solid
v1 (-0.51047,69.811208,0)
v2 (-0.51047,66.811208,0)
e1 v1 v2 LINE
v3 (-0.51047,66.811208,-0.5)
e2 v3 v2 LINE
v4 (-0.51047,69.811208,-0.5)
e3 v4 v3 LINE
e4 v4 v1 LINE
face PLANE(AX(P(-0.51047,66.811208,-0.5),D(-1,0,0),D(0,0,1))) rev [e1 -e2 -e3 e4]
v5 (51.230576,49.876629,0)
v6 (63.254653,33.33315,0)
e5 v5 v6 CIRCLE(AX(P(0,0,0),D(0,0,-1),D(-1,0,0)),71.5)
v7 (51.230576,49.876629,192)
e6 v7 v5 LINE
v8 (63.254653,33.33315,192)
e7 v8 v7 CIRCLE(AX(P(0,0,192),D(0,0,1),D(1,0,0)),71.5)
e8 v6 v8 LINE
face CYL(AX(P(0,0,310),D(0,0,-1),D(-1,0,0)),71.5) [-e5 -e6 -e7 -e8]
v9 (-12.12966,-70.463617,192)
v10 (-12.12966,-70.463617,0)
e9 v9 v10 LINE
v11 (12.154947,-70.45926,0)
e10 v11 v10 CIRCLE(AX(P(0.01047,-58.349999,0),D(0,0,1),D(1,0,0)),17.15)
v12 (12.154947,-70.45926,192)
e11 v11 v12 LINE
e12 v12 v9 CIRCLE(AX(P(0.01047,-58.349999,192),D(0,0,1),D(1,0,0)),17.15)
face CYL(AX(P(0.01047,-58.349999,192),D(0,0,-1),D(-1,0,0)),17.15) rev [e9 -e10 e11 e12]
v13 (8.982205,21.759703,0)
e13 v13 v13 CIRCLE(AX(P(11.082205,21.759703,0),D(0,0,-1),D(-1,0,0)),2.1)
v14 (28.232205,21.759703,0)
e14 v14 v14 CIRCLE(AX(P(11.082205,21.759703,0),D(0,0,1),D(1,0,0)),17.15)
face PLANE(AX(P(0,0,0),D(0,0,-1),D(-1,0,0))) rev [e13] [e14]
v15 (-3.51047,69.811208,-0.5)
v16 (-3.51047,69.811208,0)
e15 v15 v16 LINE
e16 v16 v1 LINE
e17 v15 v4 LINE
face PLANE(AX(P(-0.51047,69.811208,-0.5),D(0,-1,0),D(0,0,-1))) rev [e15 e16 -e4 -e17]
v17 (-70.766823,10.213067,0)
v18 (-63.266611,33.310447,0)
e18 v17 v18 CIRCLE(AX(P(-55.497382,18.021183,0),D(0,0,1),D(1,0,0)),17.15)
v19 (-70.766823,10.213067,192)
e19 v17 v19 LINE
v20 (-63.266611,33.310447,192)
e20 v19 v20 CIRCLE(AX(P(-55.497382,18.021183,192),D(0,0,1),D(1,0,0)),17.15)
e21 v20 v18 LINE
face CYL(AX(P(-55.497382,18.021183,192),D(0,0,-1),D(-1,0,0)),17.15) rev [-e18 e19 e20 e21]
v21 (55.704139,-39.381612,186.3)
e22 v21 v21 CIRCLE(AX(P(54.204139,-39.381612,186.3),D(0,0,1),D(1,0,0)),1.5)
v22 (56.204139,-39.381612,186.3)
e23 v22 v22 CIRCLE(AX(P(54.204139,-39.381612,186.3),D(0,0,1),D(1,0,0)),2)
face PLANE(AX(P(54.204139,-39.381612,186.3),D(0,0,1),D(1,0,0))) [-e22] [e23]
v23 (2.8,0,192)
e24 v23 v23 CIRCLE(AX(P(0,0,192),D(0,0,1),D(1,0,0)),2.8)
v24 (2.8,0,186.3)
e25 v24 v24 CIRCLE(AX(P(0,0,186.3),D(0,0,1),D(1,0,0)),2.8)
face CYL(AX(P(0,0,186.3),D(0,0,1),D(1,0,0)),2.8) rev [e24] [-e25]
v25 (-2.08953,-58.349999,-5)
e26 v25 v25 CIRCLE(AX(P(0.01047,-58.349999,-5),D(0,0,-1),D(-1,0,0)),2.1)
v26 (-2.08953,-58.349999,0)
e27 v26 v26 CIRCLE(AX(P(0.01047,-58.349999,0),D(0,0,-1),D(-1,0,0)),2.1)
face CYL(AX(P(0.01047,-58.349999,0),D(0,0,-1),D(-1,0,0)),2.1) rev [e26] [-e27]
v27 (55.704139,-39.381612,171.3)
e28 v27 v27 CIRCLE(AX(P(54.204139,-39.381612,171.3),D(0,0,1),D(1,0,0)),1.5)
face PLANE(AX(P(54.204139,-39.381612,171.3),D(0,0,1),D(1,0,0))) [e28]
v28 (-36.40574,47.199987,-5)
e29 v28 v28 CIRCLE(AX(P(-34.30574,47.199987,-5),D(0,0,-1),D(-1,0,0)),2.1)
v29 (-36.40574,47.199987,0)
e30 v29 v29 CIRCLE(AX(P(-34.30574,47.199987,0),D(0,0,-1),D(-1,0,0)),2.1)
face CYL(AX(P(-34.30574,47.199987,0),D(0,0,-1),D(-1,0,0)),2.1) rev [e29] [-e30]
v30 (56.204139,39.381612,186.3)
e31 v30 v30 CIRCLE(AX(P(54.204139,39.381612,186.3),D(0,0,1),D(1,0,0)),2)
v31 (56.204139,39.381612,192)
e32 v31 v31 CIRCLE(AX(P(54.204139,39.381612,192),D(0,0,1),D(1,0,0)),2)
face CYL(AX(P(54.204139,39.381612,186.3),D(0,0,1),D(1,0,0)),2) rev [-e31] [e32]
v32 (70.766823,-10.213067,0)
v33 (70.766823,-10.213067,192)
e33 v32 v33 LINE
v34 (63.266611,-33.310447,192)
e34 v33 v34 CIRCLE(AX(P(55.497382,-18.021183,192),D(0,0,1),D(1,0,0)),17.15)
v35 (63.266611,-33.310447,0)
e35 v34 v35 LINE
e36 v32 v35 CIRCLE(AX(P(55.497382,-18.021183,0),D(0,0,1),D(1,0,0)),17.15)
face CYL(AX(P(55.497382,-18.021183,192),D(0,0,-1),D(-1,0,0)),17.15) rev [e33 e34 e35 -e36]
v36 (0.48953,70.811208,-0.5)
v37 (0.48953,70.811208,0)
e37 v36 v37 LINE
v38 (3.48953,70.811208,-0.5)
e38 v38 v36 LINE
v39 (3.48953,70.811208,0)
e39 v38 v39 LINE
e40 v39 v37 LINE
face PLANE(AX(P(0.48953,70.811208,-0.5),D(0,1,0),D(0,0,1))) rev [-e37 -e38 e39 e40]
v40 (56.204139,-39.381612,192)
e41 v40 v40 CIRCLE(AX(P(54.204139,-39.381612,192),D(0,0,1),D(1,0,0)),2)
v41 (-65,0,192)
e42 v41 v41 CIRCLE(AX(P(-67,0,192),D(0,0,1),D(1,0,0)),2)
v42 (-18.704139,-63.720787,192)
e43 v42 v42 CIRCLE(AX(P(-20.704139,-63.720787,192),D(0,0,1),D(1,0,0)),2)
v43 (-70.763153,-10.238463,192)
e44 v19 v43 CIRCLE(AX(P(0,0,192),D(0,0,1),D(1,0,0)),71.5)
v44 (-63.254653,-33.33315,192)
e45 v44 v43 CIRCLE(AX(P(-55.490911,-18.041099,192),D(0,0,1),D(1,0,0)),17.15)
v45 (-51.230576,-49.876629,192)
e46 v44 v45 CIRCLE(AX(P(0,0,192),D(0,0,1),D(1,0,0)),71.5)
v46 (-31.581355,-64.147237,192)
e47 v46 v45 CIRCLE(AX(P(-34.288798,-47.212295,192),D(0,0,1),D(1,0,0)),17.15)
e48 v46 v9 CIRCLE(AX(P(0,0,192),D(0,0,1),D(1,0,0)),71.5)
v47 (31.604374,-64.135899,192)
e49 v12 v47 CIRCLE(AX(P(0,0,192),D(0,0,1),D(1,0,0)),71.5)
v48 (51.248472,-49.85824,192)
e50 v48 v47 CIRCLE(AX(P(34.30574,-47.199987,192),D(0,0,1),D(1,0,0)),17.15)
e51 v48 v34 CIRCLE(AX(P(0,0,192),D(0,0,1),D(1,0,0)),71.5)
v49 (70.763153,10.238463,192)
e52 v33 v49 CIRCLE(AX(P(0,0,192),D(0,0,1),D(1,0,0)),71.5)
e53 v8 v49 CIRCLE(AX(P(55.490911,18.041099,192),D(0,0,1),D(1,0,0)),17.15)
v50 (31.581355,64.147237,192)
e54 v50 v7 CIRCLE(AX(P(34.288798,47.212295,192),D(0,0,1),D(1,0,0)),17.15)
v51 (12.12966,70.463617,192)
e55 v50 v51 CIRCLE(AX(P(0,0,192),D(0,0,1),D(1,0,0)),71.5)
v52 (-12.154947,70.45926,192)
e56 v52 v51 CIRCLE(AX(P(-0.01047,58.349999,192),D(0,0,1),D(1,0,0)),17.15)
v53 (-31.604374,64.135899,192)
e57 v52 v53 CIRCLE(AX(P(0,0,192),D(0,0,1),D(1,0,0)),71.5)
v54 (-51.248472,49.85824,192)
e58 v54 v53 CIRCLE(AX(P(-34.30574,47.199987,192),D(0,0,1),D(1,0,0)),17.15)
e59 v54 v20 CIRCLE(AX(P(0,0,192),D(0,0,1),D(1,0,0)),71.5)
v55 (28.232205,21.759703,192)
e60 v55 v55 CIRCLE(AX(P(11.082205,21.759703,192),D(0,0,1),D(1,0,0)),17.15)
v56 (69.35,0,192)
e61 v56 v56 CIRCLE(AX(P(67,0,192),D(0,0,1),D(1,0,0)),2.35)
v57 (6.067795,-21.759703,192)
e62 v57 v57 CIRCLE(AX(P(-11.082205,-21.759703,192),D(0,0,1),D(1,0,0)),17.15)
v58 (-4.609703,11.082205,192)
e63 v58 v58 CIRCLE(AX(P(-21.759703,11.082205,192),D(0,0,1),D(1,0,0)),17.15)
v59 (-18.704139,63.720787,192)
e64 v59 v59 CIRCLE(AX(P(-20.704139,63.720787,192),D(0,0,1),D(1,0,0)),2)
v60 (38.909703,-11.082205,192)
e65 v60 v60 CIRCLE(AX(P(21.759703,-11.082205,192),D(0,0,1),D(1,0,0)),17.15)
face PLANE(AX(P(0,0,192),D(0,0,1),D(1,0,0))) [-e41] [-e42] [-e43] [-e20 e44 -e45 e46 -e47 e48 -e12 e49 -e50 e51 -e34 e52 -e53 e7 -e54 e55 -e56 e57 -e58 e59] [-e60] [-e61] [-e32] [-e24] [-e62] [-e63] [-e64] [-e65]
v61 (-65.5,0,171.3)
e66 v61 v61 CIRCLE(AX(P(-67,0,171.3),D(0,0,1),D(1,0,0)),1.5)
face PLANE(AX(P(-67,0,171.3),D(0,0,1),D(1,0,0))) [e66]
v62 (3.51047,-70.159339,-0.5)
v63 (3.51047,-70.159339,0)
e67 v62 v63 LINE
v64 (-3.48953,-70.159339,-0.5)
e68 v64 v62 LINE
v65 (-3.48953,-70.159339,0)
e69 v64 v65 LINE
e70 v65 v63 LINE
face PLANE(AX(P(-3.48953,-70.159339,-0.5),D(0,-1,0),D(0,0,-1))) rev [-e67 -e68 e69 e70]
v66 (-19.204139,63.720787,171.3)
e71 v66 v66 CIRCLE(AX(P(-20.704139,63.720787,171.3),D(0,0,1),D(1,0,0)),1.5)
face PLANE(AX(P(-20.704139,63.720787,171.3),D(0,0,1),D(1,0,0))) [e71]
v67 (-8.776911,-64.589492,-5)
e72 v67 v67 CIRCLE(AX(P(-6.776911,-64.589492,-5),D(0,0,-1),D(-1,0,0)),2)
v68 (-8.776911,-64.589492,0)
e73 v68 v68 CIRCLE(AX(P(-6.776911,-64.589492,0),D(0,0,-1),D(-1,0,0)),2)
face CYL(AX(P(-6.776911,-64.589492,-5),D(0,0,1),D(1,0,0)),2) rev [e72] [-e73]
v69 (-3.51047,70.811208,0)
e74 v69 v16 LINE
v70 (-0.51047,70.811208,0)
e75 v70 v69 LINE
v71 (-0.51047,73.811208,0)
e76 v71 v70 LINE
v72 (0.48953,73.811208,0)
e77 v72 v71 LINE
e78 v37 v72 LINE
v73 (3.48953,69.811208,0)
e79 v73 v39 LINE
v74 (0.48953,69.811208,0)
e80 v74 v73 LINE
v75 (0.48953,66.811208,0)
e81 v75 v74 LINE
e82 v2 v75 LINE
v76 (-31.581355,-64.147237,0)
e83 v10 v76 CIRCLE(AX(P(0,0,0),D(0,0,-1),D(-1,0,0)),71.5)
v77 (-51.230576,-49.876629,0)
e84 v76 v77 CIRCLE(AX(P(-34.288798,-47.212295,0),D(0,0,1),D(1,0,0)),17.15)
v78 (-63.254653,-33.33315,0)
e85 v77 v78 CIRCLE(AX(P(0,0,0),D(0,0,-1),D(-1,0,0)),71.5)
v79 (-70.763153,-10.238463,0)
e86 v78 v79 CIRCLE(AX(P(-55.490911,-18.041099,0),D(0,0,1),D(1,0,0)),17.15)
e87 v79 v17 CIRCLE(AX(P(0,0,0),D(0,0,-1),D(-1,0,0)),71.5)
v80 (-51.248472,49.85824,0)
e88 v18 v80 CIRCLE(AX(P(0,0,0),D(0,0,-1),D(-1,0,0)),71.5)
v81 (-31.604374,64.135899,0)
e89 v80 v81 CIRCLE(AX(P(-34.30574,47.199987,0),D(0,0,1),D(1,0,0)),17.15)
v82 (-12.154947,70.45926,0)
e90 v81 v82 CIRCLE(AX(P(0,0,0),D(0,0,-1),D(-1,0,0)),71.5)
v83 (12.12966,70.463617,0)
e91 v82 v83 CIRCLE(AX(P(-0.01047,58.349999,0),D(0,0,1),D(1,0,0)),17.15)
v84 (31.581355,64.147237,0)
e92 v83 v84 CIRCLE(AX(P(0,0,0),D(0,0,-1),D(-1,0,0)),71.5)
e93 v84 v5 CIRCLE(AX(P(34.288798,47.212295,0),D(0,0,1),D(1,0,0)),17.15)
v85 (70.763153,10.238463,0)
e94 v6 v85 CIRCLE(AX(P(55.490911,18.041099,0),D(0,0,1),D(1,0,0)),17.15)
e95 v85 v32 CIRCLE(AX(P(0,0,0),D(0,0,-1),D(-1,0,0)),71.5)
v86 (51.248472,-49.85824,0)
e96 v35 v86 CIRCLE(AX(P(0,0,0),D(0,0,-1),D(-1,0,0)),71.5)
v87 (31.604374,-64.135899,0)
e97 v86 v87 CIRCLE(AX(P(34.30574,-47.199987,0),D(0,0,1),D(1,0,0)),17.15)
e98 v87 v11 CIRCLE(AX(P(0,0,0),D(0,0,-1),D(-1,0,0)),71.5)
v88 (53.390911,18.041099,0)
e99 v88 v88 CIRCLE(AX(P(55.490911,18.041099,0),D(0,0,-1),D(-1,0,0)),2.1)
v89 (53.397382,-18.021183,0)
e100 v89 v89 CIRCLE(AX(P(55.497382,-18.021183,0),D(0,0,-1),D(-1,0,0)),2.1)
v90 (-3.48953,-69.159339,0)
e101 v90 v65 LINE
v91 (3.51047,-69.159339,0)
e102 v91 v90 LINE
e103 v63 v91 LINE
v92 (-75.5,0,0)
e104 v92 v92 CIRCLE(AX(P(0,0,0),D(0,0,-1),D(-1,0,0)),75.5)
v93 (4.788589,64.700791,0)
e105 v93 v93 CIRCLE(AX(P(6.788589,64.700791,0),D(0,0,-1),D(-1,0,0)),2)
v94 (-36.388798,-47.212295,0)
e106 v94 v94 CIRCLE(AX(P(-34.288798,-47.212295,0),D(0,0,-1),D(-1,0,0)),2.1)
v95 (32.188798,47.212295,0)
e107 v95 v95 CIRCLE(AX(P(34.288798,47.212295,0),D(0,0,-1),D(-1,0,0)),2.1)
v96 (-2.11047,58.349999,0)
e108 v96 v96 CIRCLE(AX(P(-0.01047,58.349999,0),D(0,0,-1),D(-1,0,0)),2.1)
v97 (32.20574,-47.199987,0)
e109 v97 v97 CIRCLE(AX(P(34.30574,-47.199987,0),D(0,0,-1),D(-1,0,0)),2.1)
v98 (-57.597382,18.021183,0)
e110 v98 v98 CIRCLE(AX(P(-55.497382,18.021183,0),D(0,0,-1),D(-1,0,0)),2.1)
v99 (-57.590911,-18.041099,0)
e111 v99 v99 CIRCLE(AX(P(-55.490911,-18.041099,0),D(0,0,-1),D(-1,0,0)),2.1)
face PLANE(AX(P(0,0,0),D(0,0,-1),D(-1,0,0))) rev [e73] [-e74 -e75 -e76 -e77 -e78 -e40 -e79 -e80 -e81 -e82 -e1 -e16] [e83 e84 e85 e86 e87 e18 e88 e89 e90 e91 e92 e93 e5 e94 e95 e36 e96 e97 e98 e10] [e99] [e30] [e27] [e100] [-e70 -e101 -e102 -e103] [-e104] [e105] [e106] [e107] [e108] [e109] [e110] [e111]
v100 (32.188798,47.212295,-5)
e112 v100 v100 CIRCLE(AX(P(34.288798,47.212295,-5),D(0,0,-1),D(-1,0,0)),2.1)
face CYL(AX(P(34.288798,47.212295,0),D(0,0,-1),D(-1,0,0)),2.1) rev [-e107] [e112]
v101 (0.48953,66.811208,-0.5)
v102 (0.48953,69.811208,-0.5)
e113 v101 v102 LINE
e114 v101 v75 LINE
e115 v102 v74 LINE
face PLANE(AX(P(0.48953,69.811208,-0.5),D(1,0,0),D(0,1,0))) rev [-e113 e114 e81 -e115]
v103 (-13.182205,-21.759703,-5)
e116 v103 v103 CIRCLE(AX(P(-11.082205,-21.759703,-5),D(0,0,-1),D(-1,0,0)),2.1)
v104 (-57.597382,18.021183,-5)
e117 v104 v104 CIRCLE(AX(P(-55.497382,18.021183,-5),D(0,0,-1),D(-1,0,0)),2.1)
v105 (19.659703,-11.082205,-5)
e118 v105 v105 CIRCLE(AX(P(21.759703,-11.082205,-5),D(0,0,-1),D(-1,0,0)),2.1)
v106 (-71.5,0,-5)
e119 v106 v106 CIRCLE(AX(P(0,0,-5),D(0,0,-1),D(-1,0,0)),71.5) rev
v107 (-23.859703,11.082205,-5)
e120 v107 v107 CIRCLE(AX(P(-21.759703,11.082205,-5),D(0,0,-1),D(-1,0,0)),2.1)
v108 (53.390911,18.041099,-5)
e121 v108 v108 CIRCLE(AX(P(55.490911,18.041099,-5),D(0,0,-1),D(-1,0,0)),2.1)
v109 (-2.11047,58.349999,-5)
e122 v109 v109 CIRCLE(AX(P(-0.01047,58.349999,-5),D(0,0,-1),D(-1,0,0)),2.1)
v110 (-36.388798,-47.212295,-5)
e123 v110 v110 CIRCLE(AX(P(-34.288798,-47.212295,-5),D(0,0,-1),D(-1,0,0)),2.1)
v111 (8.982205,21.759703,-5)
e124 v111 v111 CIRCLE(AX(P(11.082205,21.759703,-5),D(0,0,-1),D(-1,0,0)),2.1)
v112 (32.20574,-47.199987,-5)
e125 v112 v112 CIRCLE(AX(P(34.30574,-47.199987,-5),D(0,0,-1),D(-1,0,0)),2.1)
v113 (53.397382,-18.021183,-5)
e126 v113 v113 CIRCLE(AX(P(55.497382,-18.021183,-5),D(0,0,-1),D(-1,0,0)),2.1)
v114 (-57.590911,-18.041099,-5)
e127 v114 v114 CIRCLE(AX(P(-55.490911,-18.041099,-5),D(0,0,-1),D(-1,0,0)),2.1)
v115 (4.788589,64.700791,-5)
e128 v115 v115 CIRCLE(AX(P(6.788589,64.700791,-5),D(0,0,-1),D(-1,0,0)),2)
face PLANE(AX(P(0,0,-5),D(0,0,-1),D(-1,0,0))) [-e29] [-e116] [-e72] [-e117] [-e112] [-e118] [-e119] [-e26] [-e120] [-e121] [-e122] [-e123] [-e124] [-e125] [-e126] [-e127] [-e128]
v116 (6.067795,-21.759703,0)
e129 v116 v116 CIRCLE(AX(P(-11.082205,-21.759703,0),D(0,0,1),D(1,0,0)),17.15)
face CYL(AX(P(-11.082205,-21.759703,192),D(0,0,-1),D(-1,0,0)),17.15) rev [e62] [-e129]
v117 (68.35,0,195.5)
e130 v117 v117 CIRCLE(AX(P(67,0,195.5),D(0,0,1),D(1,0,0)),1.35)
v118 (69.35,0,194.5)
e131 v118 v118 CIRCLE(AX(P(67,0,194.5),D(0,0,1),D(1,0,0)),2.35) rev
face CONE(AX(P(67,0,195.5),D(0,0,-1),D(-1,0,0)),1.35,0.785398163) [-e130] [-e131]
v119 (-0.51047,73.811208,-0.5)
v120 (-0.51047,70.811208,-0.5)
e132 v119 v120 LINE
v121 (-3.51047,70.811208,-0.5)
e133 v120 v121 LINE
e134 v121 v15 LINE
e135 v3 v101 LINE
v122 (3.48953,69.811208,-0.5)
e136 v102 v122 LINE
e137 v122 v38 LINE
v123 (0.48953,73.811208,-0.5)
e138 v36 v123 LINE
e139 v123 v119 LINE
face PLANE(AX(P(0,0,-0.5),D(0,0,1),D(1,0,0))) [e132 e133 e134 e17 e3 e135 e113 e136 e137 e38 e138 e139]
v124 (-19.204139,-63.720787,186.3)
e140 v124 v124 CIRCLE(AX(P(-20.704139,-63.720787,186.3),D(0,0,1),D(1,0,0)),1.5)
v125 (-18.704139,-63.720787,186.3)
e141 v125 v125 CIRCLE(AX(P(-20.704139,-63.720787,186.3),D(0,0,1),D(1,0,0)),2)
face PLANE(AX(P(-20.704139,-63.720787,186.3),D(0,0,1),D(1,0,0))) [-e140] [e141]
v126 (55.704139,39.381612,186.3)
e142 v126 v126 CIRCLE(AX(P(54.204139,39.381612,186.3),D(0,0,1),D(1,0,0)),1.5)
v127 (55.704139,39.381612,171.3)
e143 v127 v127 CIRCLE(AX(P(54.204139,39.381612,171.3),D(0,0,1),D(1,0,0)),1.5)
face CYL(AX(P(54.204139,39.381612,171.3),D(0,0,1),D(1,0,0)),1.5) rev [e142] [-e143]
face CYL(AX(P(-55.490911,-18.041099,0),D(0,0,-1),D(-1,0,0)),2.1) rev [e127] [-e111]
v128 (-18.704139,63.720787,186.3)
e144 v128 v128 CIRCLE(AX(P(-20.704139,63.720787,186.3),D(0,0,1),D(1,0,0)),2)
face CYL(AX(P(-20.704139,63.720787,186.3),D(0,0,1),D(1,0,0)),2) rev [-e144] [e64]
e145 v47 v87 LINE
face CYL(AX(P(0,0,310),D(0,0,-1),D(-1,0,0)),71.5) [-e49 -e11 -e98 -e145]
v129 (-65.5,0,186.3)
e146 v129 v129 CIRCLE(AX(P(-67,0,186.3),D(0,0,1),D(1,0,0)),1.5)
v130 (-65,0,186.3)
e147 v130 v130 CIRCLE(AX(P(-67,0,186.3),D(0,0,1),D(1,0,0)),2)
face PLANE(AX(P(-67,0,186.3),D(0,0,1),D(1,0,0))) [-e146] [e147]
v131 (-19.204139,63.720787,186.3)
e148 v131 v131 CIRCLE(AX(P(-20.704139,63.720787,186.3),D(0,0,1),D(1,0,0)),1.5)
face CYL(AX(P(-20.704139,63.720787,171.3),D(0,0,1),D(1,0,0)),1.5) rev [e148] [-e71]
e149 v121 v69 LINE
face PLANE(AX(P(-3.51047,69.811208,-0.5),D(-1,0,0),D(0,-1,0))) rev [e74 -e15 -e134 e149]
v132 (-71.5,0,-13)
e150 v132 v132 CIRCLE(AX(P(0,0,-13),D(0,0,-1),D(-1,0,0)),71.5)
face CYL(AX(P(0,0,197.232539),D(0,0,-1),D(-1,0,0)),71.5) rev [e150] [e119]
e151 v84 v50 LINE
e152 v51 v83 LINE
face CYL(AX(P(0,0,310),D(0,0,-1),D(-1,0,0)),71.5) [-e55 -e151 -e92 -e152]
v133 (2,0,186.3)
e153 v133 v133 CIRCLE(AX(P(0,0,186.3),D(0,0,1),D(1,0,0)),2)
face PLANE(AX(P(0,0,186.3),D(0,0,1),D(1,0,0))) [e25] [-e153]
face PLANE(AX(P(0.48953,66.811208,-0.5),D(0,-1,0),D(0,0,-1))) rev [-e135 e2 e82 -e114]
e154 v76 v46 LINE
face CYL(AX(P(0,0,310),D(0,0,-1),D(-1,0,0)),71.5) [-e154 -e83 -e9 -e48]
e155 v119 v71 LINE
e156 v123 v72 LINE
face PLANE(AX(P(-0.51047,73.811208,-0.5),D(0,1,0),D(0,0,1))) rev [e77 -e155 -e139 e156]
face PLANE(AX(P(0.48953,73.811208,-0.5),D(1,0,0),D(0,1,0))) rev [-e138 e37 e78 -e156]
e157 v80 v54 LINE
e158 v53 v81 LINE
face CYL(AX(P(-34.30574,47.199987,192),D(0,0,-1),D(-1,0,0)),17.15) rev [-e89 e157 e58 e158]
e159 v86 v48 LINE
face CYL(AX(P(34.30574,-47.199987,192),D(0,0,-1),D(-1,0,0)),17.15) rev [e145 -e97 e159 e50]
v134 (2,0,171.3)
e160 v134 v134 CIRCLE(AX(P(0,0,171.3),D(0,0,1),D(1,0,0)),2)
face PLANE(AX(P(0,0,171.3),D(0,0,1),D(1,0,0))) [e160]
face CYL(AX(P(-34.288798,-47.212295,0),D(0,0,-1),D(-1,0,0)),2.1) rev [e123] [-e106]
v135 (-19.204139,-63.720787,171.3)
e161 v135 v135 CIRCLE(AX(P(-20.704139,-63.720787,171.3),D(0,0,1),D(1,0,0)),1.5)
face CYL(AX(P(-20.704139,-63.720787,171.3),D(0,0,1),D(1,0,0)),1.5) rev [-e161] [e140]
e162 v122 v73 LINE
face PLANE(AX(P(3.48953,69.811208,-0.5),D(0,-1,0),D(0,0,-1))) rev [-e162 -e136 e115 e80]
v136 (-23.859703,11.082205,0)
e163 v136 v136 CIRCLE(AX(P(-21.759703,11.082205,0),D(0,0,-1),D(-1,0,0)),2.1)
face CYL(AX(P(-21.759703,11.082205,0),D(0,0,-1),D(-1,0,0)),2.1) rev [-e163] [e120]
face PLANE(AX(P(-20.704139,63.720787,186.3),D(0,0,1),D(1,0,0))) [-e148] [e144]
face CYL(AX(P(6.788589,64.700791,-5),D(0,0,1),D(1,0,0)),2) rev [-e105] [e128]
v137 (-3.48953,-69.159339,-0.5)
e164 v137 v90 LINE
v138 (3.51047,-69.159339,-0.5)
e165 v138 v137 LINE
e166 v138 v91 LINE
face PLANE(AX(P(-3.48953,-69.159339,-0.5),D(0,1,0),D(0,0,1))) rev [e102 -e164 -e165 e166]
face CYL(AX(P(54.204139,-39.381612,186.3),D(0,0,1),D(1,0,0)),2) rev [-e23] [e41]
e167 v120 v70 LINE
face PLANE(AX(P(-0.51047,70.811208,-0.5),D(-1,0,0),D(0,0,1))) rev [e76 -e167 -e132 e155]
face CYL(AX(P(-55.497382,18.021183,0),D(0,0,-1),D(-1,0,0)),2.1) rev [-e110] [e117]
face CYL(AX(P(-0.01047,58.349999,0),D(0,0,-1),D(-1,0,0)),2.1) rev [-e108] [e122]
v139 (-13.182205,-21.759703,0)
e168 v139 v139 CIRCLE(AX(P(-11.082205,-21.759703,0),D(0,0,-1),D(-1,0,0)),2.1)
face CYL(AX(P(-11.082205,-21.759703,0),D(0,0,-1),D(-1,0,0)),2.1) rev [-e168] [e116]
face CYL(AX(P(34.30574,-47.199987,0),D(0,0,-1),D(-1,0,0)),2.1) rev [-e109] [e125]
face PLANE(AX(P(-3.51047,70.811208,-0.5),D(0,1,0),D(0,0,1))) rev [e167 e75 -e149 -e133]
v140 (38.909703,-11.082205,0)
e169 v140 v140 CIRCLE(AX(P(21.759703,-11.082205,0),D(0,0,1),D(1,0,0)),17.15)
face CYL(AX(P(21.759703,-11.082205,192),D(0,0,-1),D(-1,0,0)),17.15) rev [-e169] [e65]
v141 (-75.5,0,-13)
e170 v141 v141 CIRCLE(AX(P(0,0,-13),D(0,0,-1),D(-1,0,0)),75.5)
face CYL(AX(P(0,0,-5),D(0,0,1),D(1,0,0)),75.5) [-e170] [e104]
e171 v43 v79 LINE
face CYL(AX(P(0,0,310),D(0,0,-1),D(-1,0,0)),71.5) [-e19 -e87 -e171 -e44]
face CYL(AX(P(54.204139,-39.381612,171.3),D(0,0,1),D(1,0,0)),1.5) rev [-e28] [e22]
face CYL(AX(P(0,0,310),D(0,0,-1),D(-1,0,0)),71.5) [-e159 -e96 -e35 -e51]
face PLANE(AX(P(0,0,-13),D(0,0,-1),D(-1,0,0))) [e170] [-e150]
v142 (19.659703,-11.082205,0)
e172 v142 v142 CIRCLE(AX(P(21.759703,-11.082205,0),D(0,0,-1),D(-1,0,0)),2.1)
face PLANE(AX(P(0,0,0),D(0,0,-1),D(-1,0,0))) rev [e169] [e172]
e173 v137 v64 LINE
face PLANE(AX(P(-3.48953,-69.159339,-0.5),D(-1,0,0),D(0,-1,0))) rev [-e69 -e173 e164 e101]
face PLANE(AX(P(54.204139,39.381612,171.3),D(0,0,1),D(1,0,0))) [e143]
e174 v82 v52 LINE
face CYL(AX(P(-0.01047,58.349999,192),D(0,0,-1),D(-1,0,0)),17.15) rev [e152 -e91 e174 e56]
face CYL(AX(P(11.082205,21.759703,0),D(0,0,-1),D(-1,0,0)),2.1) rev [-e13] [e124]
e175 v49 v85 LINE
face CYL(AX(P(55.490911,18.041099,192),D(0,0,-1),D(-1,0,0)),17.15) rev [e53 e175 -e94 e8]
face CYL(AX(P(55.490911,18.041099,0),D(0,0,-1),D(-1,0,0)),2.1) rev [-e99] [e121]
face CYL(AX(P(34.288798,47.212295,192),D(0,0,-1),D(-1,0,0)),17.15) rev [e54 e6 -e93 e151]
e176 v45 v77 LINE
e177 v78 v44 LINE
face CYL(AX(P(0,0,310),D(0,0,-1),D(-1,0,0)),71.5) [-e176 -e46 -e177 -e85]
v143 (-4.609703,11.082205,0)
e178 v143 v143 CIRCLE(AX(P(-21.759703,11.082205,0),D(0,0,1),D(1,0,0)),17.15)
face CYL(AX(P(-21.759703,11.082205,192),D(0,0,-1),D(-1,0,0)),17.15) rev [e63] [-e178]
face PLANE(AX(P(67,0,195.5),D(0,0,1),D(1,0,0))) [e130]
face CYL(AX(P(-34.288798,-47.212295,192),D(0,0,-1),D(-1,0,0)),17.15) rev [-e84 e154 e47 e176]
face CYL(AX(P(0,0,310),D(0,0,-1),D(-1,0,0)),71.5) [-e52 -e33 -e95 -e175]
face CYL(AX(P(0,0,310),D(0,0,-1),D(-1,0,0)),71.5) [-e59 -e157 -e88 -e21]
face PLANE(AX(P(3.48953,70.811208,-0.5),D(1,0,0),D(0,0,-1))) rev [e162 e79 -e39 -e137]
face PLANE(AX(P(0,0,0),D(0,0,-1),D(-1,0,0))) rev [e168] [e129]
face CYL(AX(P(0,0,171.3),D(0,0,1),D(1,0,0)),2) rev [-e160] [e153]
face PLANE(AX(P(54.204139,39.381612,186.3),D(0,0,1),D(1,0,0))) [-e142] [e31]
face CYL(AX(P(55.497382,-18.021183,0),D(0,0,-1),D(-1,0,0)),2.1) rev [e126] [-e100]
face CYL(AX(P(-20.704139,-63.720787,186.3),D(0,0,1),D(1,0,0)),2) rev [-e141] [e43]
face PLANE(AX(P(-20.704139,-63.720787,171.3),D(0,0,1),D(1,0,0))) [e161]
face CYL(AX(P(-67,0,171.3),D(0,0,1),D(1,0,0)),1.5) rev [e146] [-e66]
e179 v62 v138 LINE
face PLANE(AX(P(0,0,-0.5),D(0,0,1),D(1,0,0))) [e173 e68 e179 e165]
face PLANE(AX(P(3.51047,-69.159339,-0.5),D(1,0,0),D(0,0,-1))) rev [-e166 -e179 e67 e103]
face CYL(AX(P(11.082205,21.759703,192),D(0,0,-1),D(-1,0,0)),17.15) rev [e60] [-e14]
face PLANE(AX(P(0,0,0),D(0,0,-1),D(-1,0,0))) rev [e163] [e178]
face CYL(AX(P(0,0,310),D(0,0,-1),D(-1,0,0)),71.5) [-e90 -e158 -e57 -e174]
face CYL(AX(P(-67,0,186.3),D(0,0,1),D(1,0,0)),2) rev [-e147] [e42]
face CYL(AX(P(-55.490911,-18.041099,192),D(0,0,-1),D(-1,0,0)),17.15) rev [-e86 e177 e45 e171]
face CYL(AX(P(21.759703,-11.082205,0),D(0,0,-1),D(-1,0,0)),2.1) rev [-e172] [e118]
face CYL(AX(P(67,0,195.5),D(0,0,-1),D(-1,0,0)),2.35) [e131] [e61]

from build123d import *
from build123d.topology import SkipClean

# Parameters (mm, degrees)
ESQUISSE1_R             = 75.75
ESQUISSE1_R_2           = 17.15
BOSS_EXTRU_2_DEPTH      = 192
ESQUISSE2_R             = 76
ESQUISSE2_R_2           = 71.5
ENL_V_MAT_EXTRU_1_DEPTH = 310
ESQUISSE3_R             = 75.5
ESQUISSE3_R_2           = 2
BOSS_EXTRU_3_DEPTH      = 5
ESQUISSE4_R             = 2.1
ENL_V_MAT_EXTRU_2_DEPTH = 5
ESQUISSE5_R             = 75.5
ESQUISSE5_R_2           = 65.5
BOSS_EXTRU_4_DEPTH      = 8
ENL_V_START             = -10
ESQUISSE6_R             = 2
ENL_V_MAT_EXTRU_4_DEPTH = 10
ESQUISSE8_R             = 2
ESQUISSE8_R_2           = 2.8
ENL_V_MAT_EXTRU_5_DEPTH = 5.7
ESQUISSE10_R            = 1.5
ESQUISSE10_R_2          = 2
ENL_V_MAT_EXTRU_6_DEPTH = 15
ESQUISSE11_R            = 71.5
ENL_V_MAT_EXTRU_7_DEPTH = 8
ESQUISSE12_W            = 7
ESQUISSE12_H            = 1
ENL_V_MAT_EXTRU_8_DEPTH = 0.5
ESQUISSE13_R            = 2.35
BOSS_EXTRU_6_DEPTH      = 3.5
CHANFREIN1_SIZE         = 1


with BuildPart() as part:
    # Esquisse1 → Boss.-Extru.2 (new body)
    with BuildSketch(Plane.XY):
        Circle(ESQUISSE1_R)
        with Locations((-34.305739626, 47.199986533)):
            Circle(ESQUISSE1_R_2, mode=Mode.SUBTRACT)
        with Locations((-0.010470369, 58.349999061)):
            Circle(ESQUISSE1_R_2, mode=Mode.SUBTRACT)
        with Locations((34.288798212, 47.212295191)):
            Circle(ESQUISSE1_R_2, mode=Mode.SUBTRACT)
        with Locations((55.49091131, 18.041099245)):
            Circle(ESQUISSE1_R_2, mode=Mode.SUBTRACT)
        with Locations((55.497382355, -18.021183418)):
            Circle(ESQUISSE1_R_2, mode=Mode.SUBTRACT)
        with Locations((34.305739626, -47.199986533)):
            Circle(ESQUISSE1_R_2, mode=Mode.SUBTRACT)
        with Locations((0.010470369, -58.349999061)):
            Circle(ESQUISSE1_R_2, mode=Mode.SUBTRACT)
        with Locations((-34.288798212, -47.212295191)):
            Circle(ESQUISSE1_R_2, mode=Mode.SUBTRACT)
        with Locations((-55.49091131, -18.041099245)):
            Circle(ESQUISSE1_R_2, mode=Mode.SUBTRACT)
        with Locations((-55.497382355, 18.021183418)):
            Circle(ESQUISSE1_R_2, mode=Mode.SUBTRACT)
        with Locations((-21.759702771, 11.082204515)):
            Circle(ESQUISSE1_R_2, mode=Mode.SUBTRACT)
        with Locations((11.082204515, 21.759702771)):
            Circle(ESQUISSE1_R_2, mode=Mode.SUBTRACT)
        with Locations((21.759702771, -11.082204515)):
            Circle(ESQUISSE1_R_2, mode=Mode.SUBTRACT)
        with Locations((-11.082204515, -21.759702771)):
            Circle(ESQUISSE1_R_2, mode=Mode.SUBTRACT)
    extrude(amount=BOSS_EXTRU_2_DEPTH)

    # Esquisse2 → Enlèv. mat.-Extru.1 (cut)
    with BuildSketch(Plane(origin=(0, 0, 0), x_dir=(-1, 0, 0), z_dir=(0, 0, -1))):
        Circle(ESQUISSE2_R)
        Circle(ESQUISSE2_R_2, mode=Mode.SUBTRACT)
    extrude(amount=-ENL_V_MAT_EXTRU_1_DEPTH, mode=Mode.SUBTRACT)

    # Esquisse3 → Boss.-Extru.3 (add)
    with BuildSketch(Plane(origin=(0, 0, 0), x_dir=(-1, 0, 0), z_dir=(0, 0, -1))):
        Circle(ESQUISSE3_R)
        with Locations((6.776911329, -64.589491695)):
            Circle(ESQUISSE3_R_2, mode=Mode.SUBTRACT)
        with Locations((-6.788589165, 64.700790989)):
            Circle(ESQUISSE3_R_2, mode=Mode.SUBTRACT)
    extrude(amount=BOSS_EXTRU_3_DEPTH)

    # Esquisse4 → Enlèv. mat.-Extru.2 (cut)
    with BuildSketch(Plane(origin=(0, 0, -5), x_dir=(-1, 0, 0), z_dir=(0, 0, -1))):
        with Locations((55.49091131, -18.041099245)):
            Circle(ESQUISSE4_R)
        with Locations((34.288798212, -47.212295191)):
            Circle(ESQUISSE4_R)
        with Locations((-0.010470369, -58.349999061)):
            Circle(ESQUISSE4_R)
        with Locations((-34.305739626, -47.199986533)):
            Circle(ESQUISSE4_R)
        with Locations((-55.497382355, -18.021183418)):
            Circle(ESQUISSE4_R)
        with Locations((-55.49091131, 18.041099245)):
            Circle(ESQUISSE4_R)
        with Locations((-34.288798212, 47.212295191)):
            Circle(ESQUISSE4_R)
        with Locations((0.010470369, 58.349999061)):
            Circle(ESQUISSE4_R)
        with Locations((34.305739626, 47.199986533)):
            Circle(ESQUISSE4_R)
        with Locations((55.497382355, 18.021183418)):
            Circle(ESQUISSE4_R)
        with Locations((11.082204515, -21.759702771)):
            Circle(ESQUISSE4_R)
        with Locations((-21.759702771, -11.082204515)):
            Circle(ESQUISSE4_R)
        with Locations((-11.082204515, 21.759702771)):
            Circle(ESQUISSE4_R)
        with Locations((21.759702771, 11.082204515)):
            Circle(ESQUISSE4_R)
    extrude(amount=-ENL_V_MAT_EXTRU_2_DEPTH, mode=Mode.SUBTRACT)

    # Esquisse5 → Boss.-Extru.4 (add)
    with BuildSketch(Plane(origin=(0, 0, -5), x_dir=(-1, 0, 0), z_dir=(0, 0, -1))):
        Circle(ESQUISSE5_R)
        with Locations(Location((0, 0, 0), (0, 0, 97.701419097))):
            Circle(ESQUISSE5_R_2, mode=Mode.SUBTRACT)
    extrude(amount=BOSS_EXTRU_4_DEPTH)

    # Esquisse6 → Enlèv. mat.-Extru.4 (cut)
    with SkipClean():  # the faces are left unmerged after this step: merging them gives an invalid solid
        with BuildSketch(Plane(origin=(0, 0, -13), x_dir=(-1, 0, 0), z_dir=(0, 0, -1)).offset(ENL_V_START)):
            with Locations(Location((-6.788589165, 64.700790989, 0), (0, 0, 174.019176169))):
                Circle(ESQUISSE6_R)
            with Locations(Location((6.776911329, -64.589491695, 0), (0, 0, 201.283568474))):
                Circle(ESQUISSE6_R)
        extrude(amount=ENL_V_MAT_EXTRU_4_DEPTH, mode=Mode.SUBTRACT)
    add(part.part.scale(1), mode=Mode.REPLACE)  # the faces are merged on a copy

    # Esquisse8 → Enlèv. mat.-Extru.5 (cut)
    with BuildSketch(Plane.XY.offset(192)):
        with Locations((-20.704138623, -63.720786592)):
            Circle(ESQUISSE8_R)
        with Locations((-67, 0)):
            Circle(ESQUISSE8_R)
        with Locations((-20.704138623, 63.720786592)):
            Circle(ESQUISSE8_R)
        with Locations((54.204138623, 39.381611904)):
            Circle(ESQUISSE8_R)
        with Locations((54.204138623, -39.381611904)):
            Circle(ESQUISSE8_R)
        Circle(ESQUISSE8_R_2)
    extrude(amount=-ENL_V_MAT_EXTRU_5_DEPTH, mode=Mode.SUBTRACT)

    # Esquisse10 → Enlèv. mat.-Extru.6 (cut)
    with BuildSketch(Plane.XY.offset(186.3)):
        with Locations((-20.704138623, -63.720786592)):
            Circle(ESQUISSE10_R)
        with Locations((-67, 0)):
            Circle(ESQUISSE10_R)
        with Locations((-20.704138623, 63.720786592)):
            Circle(ESQUISSE10_R)
        with Locations((54.204138623, 39.381611904)):
            Circle(ESQUISSE10_R)
        with Locations((54.204138623, -39.381611904)):
            Circle(ESQUISSE10_R)
        Circle(ESQUISSE10_R_2)
    extrude(amount=-ENL_V_MAT_EXTRU_6_DEPTH, mode=Mode.SUBTRACT)

    # Esquisse11 → Enlèv. mat.-Extru.7 (cut)
    with BuildSketch(Plane(origin=(0, 0, -13), x_dir=(-1, 0, 0), z_dir=(0, 0, -1))):
        Circle(ESQUISSE11_R)
    extrude(amount=-ENL_V_MAT_EXTRU_7_DEPTH, mode=Mode.SUBTRACT)

    # Esquisse12 → Enlèv. mat.-Extru.8 (cut)
    with BuildSketch(Plane.XY):
        with Locations((0.010470369, -69.659338912)):
            Rectangle(ESQUISSE12_W, ESQUISSE12_H)
        Polygon((-0.510470369, 70.811208438), (-0.510470369, 73.811208438), (0.489529631, 73.811208438), (0.489529631, 70.811208438), (3.489529631, 70.811208438), (3.489529631, 69.811208438), (0.489529631, 69.811208438), (0.489529631, 66.811208438), (-0.510470369, 66.811208438), (-0.510470369, 69.811208438), (-3.510470369, 69.811208438), (-3.510470369, 70.811208438), align=None)
    extrude(amount=-ENL_V_MAT_EXTRU_8_DEPTH, mode=Mode.SUBTRACT)

    # Esquisse13 → Boss.-Extru.6 (add)
    with BuildSketch(Plane.XY.offset(192)):
        with Locations((67, 0)):
            Circle(ESQUISSE13_R)
    extrude(amount=BOSS_EXTRU_6_DEPTH)

    # Chanfrein1
    chanfrein1_edges = [part.edges().sort_by_distance(p)[0] for p in [
        (64.65, 0, 195.5),
    ]]
    chamfer(chanfrein1_edges, length=CHANFREIN1_SIZE)


solid = part.part
